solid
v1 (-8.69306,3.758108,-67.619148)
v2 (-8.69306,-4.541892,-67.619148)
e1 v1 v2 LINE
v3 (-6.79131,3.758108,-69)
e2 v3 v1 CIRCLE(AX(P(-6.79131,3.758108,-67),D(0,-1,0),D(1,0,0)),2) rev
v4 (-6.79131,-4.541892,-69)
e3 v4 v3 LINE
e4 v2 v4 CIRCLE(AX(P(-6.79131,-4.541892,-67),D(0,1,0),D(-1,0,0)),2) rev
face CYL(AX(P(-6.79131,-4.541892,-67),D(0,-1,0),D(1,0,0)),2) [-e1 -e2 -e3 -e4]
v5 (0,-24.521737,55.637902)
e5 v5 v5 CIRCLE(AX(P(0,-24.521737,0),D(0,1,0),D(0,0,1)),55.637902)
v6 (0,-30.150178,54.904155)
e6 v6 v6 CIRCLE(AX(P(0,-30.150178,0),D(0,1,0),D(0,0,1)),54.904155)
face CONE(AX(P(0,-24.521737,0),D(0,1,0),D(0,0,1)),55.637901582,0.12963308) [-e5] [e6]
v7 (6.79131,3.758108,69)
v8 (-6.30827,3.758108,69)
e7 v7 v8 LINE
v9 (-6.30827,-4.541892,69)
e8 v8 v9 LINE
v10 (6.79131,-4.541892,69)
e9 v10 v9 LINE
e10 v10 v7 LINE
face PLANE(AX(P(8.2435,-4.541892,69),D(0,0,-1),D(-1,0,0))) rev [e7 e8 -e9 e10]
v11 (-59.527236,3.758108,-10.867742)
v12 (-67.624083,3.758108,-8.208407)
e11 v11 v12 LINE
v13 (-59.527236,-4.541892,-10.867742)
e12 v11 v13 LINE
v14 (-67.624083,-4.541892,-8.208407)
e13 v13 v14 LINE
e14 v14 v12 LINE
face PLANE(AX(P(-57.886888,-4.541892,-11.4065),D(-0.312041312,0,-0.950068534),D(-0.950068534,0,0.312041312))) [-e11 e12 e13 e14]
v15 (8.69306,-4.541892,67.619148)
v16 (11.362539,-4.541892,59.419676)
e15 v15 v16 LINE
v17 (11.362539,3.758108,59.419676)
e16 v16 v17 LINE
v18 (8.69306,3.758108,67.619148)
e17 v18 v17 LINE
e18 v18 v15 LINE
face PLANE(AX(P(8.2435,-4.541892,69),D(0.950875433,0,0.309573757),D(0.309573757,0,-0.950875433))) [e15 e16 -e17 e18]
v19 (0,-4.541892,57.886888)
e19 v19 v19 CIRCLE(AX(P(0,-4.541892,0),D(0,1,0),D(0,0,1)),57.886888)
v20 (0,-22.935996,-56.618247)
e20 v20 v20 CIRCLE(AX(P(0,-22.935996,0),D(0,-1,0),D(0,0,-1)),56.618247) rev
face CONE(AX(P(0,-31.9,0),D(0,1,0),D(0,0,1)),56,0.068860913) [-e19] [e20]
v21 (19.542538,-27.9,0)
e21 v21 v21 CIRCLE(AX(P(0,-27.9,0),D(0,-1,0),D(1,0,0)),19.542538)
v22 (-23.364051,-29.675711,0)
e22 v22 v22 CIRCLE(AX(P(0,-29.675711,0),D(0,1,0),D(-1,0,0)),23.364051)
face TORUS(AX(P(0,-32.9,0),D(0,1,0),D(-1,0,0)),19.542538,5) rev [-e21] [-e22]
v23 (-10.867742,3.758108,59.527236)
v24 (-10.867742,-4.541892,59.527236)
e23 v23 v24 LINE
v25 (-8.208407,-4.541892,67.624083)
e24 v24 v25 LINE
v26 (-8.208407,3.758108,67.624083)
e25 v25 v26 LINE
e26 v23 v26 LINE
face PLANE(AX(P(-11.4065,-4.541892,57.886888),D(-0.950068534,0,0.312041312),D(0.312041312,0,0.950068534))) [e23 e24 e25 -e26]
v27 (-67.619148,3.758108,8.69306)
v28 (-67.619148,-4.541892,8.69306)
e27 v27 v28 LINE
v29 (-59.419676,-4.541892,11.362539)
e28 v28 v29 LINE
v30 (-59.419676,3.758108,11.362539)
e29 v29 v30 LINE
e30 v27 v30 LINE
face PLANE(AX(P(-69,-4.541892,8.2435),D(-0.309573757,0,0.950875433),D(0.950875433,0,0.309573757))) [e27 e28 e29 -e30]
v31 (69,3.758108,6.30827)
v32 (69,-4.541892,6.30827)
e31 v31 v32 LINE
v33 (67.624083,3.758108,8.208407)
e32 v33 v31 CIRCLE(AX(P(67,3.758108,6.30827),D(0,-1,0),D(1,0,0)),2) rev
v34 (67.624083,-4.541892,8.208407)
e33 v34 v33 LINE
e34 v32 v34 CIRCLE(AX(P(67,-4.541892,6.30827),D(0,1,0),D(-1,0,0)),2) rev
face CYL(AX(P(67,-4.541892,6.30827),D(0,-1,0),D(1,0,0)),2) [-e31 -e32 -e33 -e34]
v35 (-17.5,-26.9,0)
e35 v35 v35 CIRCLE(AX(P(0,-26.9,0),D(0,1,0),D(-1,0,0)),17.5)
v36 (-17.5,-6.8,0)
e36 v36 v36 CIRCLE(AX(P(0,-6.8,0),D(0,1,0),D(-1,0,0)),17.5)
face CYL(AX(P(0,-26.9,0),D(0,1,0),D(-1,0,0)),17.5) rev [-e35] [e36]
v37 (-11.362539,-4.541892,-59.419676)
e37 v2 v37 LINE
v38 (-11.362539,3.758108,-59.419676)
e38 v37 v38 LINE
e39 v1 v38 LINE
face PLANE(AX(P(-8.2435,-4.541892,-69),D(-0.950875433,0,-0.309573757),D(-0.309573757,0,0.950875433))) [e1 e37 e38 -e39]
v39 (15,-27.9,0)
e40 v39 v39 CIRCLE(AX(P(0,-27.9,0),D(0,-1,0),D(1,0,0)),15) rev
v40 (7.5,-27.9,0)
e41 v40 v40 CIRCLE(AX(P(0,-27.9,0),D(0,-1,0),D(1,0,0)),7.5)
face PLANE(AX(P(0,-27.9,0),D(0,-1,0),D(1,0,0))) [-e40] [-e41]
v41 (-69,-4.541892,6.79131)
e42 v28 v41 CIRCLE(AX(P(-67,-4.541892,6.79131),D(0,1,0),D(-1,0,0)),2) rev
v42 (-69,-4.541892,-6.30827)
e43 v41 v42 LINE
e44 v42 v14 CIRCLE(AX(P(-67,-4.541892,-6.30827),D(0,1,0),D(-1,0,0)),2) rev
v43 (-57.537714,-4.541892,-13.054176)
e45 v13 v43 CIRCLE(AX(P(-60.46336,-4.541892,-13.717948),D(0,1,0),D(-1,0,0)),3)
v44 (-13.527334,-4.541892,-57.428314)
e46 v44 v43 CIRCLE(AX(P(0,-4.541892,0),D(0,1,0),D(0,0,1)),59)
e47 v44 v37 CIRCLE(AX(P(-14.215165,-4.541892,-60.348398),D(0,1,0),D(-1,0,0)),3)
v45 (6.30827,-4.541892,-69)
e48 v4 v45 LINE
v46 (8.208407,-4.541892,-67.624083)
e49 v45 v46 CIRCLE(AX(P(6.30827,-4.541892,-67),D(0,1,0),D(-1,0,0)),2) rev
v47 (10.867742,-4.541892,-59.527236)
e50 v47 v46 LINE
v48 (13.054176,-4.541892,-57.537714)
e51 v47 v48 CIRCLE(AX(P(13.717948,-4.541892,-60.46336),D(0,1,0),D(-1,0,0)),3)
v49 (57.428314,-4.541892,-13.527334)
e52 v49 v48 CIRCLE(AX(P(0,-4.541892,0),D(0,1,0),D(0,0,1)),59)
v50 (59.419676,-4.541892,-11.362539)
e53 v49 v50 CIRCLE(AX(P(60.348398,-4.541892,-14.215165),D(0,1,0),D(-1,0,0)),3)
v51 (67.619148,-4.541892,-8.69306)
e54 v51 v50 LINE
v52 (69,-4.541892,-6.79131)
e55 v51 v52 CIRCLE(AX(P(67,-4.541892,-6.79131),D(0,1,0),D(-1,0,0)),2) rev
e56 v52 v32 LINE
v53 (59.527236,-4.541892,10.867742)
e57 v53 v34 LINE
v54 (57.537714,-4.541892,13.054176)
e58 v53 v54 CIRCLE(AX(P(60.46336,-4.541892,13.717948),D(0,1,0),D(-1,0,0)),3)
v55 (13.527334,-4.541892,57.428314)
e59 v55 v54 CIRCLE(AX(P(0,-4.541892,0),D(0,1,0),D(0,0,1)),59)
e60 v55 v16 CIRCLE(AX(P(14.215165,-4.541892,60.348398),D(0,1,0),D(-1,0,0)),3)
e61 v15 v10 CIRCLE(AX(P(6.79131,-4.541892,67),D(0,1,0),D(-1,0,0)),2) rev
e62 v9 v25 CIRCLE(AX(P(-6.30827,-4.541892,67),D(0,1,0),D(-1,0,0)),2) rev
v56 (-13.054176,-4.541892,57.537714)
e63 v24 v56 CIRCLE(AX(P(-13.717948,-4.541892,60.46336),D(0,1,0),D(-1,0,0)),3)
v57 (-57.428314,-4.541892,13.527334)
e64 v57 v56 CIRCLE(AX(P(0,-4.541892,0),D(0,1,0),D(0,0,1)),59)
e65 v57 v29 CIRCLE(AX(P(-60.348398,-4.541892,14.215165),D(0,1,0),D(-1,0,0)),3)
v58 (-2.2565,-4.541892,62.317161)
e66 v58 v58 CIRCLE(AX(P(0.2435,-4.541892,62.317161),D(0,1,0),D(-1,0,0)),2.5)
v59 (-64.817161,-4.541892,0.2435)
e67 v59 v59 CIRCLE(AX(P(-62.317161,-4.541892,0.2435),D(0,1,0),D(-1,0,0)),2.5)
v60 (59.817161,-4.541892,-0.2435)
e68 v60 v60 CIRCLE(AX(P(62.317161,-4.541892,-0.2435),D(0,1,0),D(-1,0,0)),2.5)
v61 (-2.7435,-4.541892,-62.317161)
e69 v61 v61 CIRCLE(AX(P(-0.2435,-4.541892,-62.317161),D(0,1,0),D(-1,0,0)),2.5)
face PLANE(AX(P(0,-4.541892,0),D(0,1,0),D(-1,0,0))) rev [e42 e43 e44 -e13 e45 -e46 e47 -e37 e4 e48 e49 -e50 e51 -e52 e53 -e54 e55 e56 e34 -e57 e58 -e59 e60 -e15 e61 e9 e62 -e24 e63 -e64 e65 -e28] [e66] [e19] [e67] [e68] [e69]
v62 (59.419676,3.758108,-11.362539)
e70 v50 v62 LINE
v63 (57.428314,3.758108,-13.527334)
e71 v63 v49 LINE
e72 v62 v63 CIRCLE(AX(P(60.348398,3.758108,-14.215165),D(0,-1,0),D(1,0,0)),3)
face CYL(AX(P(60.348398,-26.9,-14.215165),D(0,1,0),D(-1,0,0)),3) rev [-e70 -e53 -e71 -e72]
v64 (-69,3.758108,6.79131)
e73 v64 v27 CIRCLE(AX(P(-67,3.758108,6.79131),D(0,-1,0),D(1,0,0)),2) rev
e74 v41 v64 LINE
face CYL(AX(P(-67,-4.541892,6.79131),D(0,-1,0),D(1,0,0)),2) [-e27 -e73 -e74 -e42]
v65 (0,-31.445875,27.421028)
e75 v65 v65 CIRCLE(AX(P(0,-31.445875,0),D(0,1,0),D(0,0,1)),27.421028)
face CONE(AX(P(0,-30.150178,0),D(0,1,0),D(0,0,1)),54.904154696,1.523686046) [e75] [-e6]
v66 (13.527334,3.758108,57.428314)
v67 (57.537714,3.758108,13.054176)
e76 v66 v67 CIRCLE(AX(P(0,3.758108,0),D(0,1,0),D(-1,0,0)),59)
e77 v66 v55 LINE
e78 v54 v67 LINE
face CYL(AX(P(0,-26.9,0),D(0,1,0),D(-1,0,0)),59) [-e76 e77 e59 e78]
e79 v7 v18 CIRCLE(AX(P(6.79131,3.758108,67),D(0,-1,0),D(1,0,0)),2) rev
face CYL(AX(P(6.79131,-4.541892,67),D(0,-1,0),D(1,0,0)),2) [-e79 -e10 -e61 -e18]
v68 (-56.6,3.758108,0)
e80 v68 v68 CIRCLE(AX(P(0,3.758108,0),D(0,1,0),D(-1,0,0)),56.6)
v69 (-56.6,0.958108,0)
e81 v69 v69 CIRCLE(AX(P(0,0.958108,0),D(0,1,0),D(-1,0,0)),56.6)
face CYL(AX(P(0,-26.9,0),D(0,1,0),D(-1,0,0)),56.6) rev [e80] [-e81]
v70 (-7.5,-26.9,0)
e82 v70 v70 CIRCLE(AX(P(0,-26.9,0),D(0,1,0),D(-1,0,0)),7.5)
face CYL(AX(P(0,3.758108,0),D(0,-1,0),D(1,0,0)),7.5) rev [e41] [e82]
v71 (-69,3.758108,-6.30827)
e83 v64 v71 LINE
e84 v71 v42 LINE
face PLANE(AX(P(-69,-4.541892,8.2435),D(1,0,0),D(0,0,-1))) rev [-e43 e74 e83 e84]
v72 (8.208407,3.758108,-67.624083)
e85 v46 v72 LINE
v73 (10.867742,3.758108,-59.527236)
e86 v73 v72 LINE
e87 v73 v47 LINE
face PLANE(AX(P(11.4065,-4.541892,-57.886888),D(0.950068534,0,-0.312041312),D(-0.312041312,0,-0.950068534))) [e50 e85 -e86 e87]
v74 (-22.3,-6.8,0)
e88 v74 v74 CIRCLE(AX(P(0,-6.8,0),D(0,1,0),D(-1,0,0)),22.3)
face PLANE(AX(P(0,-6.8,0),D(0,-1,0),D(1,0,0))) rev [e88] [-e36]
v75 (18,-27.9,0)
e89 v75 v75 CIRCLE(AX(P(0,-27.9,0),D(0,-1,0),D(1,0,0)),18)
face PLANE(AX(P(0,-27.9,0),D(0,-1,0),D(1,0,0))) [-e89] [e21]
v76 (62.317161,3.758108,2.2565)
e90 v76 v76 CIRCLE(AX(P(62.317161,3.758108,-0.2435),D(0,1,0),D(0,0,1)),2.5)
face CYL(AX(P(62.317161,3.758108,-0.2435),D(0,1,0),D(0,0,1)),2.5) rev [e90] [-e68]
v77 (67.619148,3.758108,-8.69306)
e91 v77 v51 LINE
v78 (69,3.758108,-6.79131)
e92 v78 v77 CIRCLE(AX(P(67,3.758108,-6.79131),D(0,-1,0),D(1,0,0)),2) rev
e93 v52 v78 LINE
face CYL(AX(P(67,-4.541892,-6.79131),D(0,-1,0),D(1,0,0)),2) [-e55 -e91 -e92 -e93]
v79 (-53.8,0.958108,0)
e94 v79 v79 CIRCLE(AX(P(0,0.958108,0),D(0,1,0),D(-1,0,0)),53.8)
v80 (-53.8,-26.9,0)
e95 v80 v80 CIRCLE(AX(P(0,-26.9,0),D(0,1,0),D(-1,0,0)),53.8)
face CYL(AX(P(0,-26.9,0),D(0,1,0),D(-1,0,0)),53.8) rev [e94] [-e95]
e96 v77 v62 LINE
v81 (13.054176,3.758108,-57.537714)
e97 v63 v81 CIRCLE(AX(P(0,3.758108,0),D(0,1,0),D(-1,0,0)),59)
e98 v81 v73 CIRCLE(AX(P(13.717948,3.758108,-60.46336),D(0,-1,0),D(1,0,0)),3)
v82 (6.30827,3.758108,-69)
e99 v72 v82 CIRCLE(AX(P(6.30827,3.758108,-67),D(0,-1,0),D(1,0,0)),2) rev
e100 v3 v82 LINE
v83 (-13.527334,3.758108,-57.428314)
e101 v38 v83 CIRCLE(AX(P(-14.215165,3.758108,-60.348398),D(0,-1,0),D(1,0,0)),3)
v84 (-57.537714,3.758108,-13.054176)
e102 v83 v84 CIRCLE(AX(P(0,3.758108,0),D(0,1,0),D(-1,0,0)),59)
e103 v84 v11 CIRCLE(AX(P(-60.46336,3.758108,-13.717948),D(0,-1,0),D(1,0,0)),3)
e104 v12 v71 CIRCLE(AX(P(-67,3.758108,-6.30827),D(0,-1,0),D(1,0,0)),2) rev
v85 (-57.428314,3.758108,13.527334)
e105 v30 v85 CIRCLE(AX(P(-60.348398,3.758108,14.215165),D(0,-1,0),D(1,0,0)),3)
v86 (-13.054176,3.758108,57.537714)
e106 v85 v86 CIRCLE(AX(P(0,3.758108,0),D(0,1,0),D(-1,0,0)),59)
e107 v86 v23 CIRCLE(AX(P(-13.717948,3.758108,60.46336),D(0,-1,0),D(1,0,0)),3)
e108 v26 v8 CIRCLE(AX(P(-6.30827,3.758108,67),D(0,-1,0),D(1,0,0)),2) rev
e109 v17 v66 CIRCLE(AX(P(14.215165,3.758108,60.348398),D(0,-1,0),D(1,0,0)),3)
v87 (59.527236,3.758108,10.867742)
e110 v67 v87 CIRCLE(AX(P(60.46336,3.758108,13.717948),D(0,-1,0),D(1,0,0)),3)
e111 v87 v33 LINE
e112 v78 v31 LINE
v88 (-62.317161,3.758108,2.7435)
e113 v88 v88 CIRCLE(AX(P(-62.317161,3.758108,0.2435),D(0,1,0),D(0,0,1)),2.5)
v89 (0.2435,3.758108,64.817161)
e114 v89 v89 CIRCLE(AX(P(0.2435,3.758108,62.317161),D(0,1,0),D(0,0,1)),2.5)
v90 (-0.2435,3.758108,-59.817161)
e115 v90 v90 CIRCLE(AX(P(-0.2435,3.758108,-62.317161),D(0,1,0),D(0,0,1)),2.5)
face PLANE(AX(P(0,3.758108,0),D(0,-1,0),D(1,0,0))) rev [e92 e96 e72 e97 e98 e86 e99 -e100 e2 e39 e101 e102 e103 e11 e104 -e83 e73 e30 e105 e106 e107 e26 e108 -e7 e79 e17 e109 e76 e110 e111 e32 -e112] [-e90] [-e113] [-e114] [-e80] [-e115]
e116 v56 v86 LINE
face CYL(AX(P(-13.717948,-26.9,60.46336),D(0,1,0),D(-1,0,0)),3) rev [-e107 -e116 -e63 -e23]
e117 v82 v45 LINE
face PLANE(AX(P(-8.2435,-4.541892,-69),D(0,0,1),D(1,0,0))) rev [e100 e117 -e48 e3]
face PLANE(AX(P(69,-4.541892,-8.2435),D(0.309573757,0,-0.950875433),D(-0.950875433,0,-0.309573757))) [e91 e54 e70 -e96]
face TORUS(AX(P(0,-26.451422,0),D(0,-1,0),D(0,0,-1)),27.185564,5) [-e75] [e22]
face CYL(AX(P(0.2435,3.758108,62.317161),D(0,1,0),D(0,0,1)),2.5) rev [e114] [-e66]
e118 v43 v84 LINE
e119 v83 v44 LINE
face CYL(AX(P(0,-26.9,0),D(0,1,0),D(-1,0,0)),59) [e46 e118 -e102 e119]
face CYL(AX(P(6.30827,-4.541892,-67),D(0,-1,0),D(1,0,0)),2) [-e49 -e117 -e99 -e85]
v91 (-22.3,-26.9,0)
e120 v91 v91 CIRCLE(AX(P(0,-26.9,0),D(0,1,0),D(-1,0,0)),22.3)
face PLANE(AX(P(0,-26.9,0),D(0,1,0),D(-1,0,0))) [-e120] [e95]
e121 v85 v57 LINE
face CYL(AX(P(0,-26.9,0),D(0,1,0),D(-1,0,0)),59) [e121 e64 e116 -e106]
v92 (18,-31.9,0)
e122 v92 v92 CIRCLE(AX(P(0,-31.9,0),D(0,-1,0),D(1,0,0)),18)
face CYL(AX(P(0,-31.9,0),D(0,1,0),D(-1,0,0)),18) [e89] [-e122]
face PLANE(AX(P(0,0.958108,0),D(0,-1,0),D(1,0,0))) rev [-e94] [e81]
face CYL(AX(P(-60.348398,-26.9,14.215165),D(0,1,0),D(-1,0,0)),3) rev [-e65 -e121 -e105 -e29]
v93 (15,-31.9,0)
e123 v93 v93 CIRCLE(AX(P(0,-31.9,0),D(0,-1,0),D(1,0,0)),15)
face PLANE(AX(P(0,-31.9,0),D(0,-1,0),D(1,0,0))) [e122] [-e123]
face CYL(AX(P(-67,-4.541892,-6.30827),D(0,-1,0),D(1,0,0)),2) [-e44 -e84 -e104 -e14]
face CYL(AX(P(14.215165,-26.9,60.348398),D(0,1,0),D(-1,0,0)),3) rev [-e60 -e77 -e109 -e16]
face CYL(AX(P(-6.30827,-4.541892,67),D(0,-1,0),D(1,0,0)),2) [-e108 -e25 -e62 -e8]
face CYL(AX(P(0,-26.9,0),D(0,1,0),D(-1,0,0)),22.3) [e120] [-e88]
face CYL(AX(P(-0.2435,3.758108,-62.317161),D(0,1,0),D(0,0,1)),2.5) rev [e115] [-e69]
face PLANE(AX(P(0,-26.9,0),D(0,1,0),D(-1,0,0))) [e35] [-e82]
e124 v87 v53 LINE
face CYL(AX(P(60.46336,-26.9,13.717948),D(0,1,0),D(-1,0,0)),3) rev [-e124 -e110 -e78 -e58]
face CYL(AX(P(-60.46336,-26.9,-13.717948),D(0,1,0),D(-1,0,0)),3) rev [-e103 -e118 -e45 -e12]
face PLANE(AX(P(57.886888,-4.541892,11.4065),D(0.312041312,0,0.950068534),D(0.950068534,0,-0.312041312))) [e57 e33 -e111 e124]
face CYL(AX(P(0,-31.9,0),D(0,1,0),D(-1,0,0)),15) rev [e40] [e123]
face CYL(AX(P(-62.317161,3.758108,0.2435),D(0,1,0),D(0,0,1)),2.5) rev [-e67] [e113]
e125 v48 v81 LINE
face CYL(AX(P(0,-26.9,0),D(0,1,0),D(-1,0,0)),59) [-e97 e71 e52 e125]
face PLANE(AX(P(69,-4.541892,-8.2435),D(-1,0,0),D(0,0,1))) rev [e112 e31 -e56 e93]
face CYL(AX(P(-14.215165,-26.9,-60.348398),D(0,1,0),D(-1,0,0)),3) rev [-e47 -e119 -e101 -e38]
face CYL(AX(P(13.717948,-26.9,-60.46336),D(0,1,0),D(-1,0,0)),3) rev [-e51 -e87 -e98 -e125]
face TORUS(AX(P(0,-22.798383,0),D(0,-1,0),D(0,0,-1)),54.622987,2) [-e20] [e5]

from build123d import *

# Parameters (mm, degrees)
BOSS_EXTRUDE2_DEPTH     = 8.3
CIRPATTERN1_COUNT       = 4
SKETCH13_R              = 22.4
CUT_EXTRUDE3_DEPTH      = 4
FILLET1_R               = 5
SKETCH15_R              = 18
SKETCH15_R_2            = 15
BOSS_EXTRUDE3_DEPTH     = 4
SKETCH16_R              = 7.5
CUT_EXTRUDE4_DEPTH      = 103.587698187
FILLET2_R               = 5
FILLET4_R               = 3
FILLET5_R               = 2
FILLET6_R               = 2
TAP_DRILL_FOR_M6_TAP1_D = 5


with BuildPart() as part:
    # Sketch1 → Revolve1 (revolve)
    with BuildSketch(Plane.XY, mode=Mode.PRIVATE) as revolve1_sk:
        Polygon((22.3, -26.9), (53.8, -26.9), (53.8, 0.95810827), (56.6, 0.95810827), (56.6, 3.75810827), (59, 3.75810827), (59, 0), (59, -31.9), (0, -31.9), (0, -26.9), (17.5, -26.9), (17.5, -6.8), (22.3, -6.8), align=None)
    revolve(revolve1_sk.sketch.rotate(Axis((0, -26.9, 0), (0, -1, 0)), 180), axis=Axis((0, -26.9, 0), (0, -1, 0)))

    # Sketch2 → Boss-Extrude2 (add)
    with BuildSketch(Plane(origin=(0, 3.75810827, 0), x_dir=(1, 0, 0), z_dir=(0, 1, 0))):
        Polygon((7.756499668, 69), (-8.243500332, 69), (-11.893500332, 57.788793462), (11.406499668, 57.88688768), align=None)
    boss_extrude2 = extrude(amount=-BOSS_EXTRUDE2_DEPTH)

    # CirPattern1: Boss-Extrude2 ×4 about axis
    cirpattern1_axis = Axis((0, 0, 0), (0, 1, 0))
    for i in range(1, CIRPATTERN1_COUNT):
        add(boss_extrude2.rotate(cirpattern1_axis, i * 360 / CIRPATTERN1_COUNT))

    # Sketch10 → Cut-Revolve4 (revolve, cut)
    with BuildSketch(Plane(origin=(0, 0, 0), x_dir=(0, 0, -1), z_dir=(1, 0, 0)), mode=Mode.PRIVATE) as cut_revolve4_sk:
        Polygon((59.74122217, -25.056663082), (55.637901582, -24.521737202), (54.676040662, -31.9), (59.74122217, -32.409345916), align=None)
    revolve(cut_revolve4_sk.sketch.rotate(Axis((0, -1.306352148, 0), (0, -1, 0)), 281.147212692), axis=Axis((0, -1.306352148, 0), (0, -1, 0)), mode=Mode.SUBTRACT)

    # Sketch8 → Cut-Revolve5 (revolve, cut)
    with BuildSketch(Plane(origin=(0, 0, 0), x_dir=(0, 0, -1), z_dir=(1, 0, 0)), mode=Mode.PRIVATE) as cut_revolve5_sk:
        Polygon((57.88688768, -4.54189173), (59, -4.54189173), (59, -31.9), (56, -31.9), align=None)
    revolve(cut_revolve5_sk.sketch.rotate(Axis((0, 5.358719866, 0), (0, -1, 0)), 180), axis=Axis((0, 5.358719866, 0), (0, -1, 0)), mode=Mode.SUBTRACT)

    # Sketch12 → Cut-Revolve6 (revolve, cut)
    with BuildSketch(Plane(origin=(0, 0, 0), x_dir=(0, 0, -1), z_dir=(1, 0, 0))):
        Polygon((-55.049732908, -31.9), (-54.904154696, -30.15017811), (-17.788536772, -31.9), align=None)
    revolve(axis=Axis((0, 13.859698408, 0), (0, -1, 0)), mode=Mode.SUBTRACT)

    # Sketch13 → Cut-Extrude3 (cut)
    with BuildSketch(Plane.XZ.offset(31.9)):
        Circle(SKETCH13_R)
    extrude(amount=-CUT_EXTRUDE3_DEPTH, mode=Mode.SUBTRACT)

    # Fillet1
    # the kernel refuses this fillet: 5 mm, written as the material it takes off along each edge
    with BuildSketch(Plane(origin=(0, -31.68259181, 0), x_dir=(0, 0, 1), z_dir=(1, 0, 0))) as fillet1_piece_1:
        with BuildLine():
            CenterArc((27.185563904, -5.231169776), FILLET1_R, 87.300779723, 75.858290504)
            Line((22.4, -3.78259181), (22.304288722, -3.753620251))
            ThreePointArc((22.304288722, -3.753620251), (22.3, -1.891295905), (22.3, 0))
            Line((22.3, 0), (22.404709286, 0.099889052))
            Line((22.404709286, 0.099889052), (27.425737475, -0.136828145))
            Line((27.425737475, -0.136828145), (27.421028189, -0.236717197))
        make_face()
    revolve(axis=Axis((0, -31.68259181, 0), (0, -1, 0)), revolution_arc=270, mode=Mode.SUBTRACT)
    with BuildSketch(Plane(origin=(0, -31.68259181, 0), x_dir=(1, 0, 0), z_dir=(0, 0, -1))) as fillet1_piece_2:
        with BuildLine():
            CenterArc((27.185563904, -5.231169776), FILLET1_R, 87.300779723, 75.858290504)
            Line((22.4, -3.78259181), (22.304288722, -3.753620251))
            ThreePointArc((22.304288722, -3.753620251), (22.3, -1.891295905), (22.3, 0))
            Line((22.3, 0), (22.404709286, 0.099889052))
            Line((22.404709286, 0.099889052), (27.425737475, -0.136828145))
            Line((27.425737475, -0.136828145), (27.421028189, -0.236717197))
        make_face()
    revolve(axis=Axis((0, -31.68259181, 0), (0, -1, 0)), revolution_arc=90, mode=Mode.SUBTRACT)

    # Sketch15 → Boss-Extrude3 (add)
    with BuildSketch(Plane.XZ.offset(27.9)):
        Circle(SKETCH15_R)
        Circle(SKETCH15_R_2, mode=Mode.SUBTRACT)
    extrude(amount=BOSS_EXTRUDE3_DEPTH)

    # Sketch16 → Cut-Extrude4 (cut, through all)
    with BuildSketch(Plane.XZ.offset(27.9)):
        Circle(SKETCH16_R)
    extrude(amount=-CUT_EXTRUDE4_DEPTH, mode=Mode.SUBTRACT)

    # Fillet2
    fillet2_edges = [part.edges().sort_by_distance(p)[0] for p in [
        (-22.4, -27.9, 0),
    ]]
    fillet(fillet2_edges, radius=FILLET2_R)

    # Fillet4
    fillet4_edges = [part.edges().sort_by_distance(p)[0] for p in [
        (11.406499668, -0.39189173, -57.88688768),
        (-11.893500332, -0.39189173, -57.788793462),
        (-57.88688768, -0.39189173, -11.406499668),
        (-57.788793462, -0.39189173, 11.893500332),
        (-11.406499668, -0.39189173, 57.88688768),
        (11.893500332, -0.39189173, 57.788793462),
        (57.88688768, -0.39189173, 11.406499668),
        (57.788793462, -0.39189173, -11.893500332),
    ]]
    fillet(fillet4_edges, radius=FILLET4_R)

    # Fillet5
    fillet5_edges = [part.edges().sort_by_distance(p)[0] for p in [
        (-8.243500332, -0.39189173, -69),
        (7.756499668, -0.39189173, -69),
        (-69, -0.39189173, 8.243500332),
        (-69, -0.39189173, -7.756499668),
        (8.243500332, -0.39189173, 69),
        (-7.756499668, -0.39189173, 69),
        (69, -0.39189173, -8.243500332),
        (69, -0.39189173, 7.756499668),
    ]]
    fillet(fillet5_edges, radius=FILLET5_R)

    # Fillet6
    # the kernel refuses this fillet: 2 mm, written as the material it takes off along each edge
    with BuildSketch(Plane(origin=(0, -24.634269562, 0), x_dir=(0, 0, 1), z_dir=(-1, 0, 0))) as fillet6_piece_1:
        with BuildLine():
            CenterArc((54.622986935, 1.835886142), FILLET6_R, 300.494611252, 55.559949074)
            Line((55.637901582, 0.112532359), (55.658199875, 0.078065284))
            ThreePointArc((55.658199875, 0.078065284), (56.064338554, 0.016601804), (56.495946338, -0.039664376))
            Line((56.495946338, -0.039664376), (56.541022351, -0.00275226))
            Line((56.541022351, -0.00275226), (56.658152184, 1.695520873))
            Line((56.658152184, 1.695520873), (56.618246983, 1.698273133))
        make_face()
    revolve(axis=Axis((0, -24.634269562, 0), (0, 1, 0)), revolution_arc=258.852787308, mode=Mode.SUBTRACT)
    with BuildSketch(Plane(origin=(0, -24.634269562, 0), x_dir=(-0.9811336895007642, 0, -0.1933305028354758), z_dir=(0.1933305028354758, 0, -0.9811336895007642))) as fillet6_piece_2:
        with BuildLine():
            CenterArc((54.622986935, 1.835886142), FILLET6_R, 300.494611252, 55.559949074)
            Line((55.637901582, 0.112532359), (55.658199875, 0.078065284))
            ThreePointArc((55.658199875, 0.078065284), (56.064338554, 0.016601804), (56.495946338, -0.039664376))
            Line((56.495946338, -0.039664376), (56.541022351, -0.00275226))
            Line((56.541022351, -0.00275226), (56.658152184, 1.695520873))
            Line((56.658152184, 1.695520873), (56.618246983, 1.698273133))
        make_face()
    revolve(axis=Axis((0, -24.634269562, 0), (0, 1, 0)), revolution_arc=101.147212692, mode=Mode.SUBTRACT)

    # Tap Drill for M6 Tap1 (through all)
    with Locations(Plane(origin=(0, 3.75810827, 0), x_dir=(1, 0, 0), z_dir=(0, 1, 0))):
        with Locations((-0.243500332, 62.31716076), (62.31716076, 0.243500332), (0.243500332, -62.31716076), (-62.31716076, -0.243500332)):
            Hole(TAP_DRILL_FOR_M6_TAP1_D / 2)


solid = part.part
